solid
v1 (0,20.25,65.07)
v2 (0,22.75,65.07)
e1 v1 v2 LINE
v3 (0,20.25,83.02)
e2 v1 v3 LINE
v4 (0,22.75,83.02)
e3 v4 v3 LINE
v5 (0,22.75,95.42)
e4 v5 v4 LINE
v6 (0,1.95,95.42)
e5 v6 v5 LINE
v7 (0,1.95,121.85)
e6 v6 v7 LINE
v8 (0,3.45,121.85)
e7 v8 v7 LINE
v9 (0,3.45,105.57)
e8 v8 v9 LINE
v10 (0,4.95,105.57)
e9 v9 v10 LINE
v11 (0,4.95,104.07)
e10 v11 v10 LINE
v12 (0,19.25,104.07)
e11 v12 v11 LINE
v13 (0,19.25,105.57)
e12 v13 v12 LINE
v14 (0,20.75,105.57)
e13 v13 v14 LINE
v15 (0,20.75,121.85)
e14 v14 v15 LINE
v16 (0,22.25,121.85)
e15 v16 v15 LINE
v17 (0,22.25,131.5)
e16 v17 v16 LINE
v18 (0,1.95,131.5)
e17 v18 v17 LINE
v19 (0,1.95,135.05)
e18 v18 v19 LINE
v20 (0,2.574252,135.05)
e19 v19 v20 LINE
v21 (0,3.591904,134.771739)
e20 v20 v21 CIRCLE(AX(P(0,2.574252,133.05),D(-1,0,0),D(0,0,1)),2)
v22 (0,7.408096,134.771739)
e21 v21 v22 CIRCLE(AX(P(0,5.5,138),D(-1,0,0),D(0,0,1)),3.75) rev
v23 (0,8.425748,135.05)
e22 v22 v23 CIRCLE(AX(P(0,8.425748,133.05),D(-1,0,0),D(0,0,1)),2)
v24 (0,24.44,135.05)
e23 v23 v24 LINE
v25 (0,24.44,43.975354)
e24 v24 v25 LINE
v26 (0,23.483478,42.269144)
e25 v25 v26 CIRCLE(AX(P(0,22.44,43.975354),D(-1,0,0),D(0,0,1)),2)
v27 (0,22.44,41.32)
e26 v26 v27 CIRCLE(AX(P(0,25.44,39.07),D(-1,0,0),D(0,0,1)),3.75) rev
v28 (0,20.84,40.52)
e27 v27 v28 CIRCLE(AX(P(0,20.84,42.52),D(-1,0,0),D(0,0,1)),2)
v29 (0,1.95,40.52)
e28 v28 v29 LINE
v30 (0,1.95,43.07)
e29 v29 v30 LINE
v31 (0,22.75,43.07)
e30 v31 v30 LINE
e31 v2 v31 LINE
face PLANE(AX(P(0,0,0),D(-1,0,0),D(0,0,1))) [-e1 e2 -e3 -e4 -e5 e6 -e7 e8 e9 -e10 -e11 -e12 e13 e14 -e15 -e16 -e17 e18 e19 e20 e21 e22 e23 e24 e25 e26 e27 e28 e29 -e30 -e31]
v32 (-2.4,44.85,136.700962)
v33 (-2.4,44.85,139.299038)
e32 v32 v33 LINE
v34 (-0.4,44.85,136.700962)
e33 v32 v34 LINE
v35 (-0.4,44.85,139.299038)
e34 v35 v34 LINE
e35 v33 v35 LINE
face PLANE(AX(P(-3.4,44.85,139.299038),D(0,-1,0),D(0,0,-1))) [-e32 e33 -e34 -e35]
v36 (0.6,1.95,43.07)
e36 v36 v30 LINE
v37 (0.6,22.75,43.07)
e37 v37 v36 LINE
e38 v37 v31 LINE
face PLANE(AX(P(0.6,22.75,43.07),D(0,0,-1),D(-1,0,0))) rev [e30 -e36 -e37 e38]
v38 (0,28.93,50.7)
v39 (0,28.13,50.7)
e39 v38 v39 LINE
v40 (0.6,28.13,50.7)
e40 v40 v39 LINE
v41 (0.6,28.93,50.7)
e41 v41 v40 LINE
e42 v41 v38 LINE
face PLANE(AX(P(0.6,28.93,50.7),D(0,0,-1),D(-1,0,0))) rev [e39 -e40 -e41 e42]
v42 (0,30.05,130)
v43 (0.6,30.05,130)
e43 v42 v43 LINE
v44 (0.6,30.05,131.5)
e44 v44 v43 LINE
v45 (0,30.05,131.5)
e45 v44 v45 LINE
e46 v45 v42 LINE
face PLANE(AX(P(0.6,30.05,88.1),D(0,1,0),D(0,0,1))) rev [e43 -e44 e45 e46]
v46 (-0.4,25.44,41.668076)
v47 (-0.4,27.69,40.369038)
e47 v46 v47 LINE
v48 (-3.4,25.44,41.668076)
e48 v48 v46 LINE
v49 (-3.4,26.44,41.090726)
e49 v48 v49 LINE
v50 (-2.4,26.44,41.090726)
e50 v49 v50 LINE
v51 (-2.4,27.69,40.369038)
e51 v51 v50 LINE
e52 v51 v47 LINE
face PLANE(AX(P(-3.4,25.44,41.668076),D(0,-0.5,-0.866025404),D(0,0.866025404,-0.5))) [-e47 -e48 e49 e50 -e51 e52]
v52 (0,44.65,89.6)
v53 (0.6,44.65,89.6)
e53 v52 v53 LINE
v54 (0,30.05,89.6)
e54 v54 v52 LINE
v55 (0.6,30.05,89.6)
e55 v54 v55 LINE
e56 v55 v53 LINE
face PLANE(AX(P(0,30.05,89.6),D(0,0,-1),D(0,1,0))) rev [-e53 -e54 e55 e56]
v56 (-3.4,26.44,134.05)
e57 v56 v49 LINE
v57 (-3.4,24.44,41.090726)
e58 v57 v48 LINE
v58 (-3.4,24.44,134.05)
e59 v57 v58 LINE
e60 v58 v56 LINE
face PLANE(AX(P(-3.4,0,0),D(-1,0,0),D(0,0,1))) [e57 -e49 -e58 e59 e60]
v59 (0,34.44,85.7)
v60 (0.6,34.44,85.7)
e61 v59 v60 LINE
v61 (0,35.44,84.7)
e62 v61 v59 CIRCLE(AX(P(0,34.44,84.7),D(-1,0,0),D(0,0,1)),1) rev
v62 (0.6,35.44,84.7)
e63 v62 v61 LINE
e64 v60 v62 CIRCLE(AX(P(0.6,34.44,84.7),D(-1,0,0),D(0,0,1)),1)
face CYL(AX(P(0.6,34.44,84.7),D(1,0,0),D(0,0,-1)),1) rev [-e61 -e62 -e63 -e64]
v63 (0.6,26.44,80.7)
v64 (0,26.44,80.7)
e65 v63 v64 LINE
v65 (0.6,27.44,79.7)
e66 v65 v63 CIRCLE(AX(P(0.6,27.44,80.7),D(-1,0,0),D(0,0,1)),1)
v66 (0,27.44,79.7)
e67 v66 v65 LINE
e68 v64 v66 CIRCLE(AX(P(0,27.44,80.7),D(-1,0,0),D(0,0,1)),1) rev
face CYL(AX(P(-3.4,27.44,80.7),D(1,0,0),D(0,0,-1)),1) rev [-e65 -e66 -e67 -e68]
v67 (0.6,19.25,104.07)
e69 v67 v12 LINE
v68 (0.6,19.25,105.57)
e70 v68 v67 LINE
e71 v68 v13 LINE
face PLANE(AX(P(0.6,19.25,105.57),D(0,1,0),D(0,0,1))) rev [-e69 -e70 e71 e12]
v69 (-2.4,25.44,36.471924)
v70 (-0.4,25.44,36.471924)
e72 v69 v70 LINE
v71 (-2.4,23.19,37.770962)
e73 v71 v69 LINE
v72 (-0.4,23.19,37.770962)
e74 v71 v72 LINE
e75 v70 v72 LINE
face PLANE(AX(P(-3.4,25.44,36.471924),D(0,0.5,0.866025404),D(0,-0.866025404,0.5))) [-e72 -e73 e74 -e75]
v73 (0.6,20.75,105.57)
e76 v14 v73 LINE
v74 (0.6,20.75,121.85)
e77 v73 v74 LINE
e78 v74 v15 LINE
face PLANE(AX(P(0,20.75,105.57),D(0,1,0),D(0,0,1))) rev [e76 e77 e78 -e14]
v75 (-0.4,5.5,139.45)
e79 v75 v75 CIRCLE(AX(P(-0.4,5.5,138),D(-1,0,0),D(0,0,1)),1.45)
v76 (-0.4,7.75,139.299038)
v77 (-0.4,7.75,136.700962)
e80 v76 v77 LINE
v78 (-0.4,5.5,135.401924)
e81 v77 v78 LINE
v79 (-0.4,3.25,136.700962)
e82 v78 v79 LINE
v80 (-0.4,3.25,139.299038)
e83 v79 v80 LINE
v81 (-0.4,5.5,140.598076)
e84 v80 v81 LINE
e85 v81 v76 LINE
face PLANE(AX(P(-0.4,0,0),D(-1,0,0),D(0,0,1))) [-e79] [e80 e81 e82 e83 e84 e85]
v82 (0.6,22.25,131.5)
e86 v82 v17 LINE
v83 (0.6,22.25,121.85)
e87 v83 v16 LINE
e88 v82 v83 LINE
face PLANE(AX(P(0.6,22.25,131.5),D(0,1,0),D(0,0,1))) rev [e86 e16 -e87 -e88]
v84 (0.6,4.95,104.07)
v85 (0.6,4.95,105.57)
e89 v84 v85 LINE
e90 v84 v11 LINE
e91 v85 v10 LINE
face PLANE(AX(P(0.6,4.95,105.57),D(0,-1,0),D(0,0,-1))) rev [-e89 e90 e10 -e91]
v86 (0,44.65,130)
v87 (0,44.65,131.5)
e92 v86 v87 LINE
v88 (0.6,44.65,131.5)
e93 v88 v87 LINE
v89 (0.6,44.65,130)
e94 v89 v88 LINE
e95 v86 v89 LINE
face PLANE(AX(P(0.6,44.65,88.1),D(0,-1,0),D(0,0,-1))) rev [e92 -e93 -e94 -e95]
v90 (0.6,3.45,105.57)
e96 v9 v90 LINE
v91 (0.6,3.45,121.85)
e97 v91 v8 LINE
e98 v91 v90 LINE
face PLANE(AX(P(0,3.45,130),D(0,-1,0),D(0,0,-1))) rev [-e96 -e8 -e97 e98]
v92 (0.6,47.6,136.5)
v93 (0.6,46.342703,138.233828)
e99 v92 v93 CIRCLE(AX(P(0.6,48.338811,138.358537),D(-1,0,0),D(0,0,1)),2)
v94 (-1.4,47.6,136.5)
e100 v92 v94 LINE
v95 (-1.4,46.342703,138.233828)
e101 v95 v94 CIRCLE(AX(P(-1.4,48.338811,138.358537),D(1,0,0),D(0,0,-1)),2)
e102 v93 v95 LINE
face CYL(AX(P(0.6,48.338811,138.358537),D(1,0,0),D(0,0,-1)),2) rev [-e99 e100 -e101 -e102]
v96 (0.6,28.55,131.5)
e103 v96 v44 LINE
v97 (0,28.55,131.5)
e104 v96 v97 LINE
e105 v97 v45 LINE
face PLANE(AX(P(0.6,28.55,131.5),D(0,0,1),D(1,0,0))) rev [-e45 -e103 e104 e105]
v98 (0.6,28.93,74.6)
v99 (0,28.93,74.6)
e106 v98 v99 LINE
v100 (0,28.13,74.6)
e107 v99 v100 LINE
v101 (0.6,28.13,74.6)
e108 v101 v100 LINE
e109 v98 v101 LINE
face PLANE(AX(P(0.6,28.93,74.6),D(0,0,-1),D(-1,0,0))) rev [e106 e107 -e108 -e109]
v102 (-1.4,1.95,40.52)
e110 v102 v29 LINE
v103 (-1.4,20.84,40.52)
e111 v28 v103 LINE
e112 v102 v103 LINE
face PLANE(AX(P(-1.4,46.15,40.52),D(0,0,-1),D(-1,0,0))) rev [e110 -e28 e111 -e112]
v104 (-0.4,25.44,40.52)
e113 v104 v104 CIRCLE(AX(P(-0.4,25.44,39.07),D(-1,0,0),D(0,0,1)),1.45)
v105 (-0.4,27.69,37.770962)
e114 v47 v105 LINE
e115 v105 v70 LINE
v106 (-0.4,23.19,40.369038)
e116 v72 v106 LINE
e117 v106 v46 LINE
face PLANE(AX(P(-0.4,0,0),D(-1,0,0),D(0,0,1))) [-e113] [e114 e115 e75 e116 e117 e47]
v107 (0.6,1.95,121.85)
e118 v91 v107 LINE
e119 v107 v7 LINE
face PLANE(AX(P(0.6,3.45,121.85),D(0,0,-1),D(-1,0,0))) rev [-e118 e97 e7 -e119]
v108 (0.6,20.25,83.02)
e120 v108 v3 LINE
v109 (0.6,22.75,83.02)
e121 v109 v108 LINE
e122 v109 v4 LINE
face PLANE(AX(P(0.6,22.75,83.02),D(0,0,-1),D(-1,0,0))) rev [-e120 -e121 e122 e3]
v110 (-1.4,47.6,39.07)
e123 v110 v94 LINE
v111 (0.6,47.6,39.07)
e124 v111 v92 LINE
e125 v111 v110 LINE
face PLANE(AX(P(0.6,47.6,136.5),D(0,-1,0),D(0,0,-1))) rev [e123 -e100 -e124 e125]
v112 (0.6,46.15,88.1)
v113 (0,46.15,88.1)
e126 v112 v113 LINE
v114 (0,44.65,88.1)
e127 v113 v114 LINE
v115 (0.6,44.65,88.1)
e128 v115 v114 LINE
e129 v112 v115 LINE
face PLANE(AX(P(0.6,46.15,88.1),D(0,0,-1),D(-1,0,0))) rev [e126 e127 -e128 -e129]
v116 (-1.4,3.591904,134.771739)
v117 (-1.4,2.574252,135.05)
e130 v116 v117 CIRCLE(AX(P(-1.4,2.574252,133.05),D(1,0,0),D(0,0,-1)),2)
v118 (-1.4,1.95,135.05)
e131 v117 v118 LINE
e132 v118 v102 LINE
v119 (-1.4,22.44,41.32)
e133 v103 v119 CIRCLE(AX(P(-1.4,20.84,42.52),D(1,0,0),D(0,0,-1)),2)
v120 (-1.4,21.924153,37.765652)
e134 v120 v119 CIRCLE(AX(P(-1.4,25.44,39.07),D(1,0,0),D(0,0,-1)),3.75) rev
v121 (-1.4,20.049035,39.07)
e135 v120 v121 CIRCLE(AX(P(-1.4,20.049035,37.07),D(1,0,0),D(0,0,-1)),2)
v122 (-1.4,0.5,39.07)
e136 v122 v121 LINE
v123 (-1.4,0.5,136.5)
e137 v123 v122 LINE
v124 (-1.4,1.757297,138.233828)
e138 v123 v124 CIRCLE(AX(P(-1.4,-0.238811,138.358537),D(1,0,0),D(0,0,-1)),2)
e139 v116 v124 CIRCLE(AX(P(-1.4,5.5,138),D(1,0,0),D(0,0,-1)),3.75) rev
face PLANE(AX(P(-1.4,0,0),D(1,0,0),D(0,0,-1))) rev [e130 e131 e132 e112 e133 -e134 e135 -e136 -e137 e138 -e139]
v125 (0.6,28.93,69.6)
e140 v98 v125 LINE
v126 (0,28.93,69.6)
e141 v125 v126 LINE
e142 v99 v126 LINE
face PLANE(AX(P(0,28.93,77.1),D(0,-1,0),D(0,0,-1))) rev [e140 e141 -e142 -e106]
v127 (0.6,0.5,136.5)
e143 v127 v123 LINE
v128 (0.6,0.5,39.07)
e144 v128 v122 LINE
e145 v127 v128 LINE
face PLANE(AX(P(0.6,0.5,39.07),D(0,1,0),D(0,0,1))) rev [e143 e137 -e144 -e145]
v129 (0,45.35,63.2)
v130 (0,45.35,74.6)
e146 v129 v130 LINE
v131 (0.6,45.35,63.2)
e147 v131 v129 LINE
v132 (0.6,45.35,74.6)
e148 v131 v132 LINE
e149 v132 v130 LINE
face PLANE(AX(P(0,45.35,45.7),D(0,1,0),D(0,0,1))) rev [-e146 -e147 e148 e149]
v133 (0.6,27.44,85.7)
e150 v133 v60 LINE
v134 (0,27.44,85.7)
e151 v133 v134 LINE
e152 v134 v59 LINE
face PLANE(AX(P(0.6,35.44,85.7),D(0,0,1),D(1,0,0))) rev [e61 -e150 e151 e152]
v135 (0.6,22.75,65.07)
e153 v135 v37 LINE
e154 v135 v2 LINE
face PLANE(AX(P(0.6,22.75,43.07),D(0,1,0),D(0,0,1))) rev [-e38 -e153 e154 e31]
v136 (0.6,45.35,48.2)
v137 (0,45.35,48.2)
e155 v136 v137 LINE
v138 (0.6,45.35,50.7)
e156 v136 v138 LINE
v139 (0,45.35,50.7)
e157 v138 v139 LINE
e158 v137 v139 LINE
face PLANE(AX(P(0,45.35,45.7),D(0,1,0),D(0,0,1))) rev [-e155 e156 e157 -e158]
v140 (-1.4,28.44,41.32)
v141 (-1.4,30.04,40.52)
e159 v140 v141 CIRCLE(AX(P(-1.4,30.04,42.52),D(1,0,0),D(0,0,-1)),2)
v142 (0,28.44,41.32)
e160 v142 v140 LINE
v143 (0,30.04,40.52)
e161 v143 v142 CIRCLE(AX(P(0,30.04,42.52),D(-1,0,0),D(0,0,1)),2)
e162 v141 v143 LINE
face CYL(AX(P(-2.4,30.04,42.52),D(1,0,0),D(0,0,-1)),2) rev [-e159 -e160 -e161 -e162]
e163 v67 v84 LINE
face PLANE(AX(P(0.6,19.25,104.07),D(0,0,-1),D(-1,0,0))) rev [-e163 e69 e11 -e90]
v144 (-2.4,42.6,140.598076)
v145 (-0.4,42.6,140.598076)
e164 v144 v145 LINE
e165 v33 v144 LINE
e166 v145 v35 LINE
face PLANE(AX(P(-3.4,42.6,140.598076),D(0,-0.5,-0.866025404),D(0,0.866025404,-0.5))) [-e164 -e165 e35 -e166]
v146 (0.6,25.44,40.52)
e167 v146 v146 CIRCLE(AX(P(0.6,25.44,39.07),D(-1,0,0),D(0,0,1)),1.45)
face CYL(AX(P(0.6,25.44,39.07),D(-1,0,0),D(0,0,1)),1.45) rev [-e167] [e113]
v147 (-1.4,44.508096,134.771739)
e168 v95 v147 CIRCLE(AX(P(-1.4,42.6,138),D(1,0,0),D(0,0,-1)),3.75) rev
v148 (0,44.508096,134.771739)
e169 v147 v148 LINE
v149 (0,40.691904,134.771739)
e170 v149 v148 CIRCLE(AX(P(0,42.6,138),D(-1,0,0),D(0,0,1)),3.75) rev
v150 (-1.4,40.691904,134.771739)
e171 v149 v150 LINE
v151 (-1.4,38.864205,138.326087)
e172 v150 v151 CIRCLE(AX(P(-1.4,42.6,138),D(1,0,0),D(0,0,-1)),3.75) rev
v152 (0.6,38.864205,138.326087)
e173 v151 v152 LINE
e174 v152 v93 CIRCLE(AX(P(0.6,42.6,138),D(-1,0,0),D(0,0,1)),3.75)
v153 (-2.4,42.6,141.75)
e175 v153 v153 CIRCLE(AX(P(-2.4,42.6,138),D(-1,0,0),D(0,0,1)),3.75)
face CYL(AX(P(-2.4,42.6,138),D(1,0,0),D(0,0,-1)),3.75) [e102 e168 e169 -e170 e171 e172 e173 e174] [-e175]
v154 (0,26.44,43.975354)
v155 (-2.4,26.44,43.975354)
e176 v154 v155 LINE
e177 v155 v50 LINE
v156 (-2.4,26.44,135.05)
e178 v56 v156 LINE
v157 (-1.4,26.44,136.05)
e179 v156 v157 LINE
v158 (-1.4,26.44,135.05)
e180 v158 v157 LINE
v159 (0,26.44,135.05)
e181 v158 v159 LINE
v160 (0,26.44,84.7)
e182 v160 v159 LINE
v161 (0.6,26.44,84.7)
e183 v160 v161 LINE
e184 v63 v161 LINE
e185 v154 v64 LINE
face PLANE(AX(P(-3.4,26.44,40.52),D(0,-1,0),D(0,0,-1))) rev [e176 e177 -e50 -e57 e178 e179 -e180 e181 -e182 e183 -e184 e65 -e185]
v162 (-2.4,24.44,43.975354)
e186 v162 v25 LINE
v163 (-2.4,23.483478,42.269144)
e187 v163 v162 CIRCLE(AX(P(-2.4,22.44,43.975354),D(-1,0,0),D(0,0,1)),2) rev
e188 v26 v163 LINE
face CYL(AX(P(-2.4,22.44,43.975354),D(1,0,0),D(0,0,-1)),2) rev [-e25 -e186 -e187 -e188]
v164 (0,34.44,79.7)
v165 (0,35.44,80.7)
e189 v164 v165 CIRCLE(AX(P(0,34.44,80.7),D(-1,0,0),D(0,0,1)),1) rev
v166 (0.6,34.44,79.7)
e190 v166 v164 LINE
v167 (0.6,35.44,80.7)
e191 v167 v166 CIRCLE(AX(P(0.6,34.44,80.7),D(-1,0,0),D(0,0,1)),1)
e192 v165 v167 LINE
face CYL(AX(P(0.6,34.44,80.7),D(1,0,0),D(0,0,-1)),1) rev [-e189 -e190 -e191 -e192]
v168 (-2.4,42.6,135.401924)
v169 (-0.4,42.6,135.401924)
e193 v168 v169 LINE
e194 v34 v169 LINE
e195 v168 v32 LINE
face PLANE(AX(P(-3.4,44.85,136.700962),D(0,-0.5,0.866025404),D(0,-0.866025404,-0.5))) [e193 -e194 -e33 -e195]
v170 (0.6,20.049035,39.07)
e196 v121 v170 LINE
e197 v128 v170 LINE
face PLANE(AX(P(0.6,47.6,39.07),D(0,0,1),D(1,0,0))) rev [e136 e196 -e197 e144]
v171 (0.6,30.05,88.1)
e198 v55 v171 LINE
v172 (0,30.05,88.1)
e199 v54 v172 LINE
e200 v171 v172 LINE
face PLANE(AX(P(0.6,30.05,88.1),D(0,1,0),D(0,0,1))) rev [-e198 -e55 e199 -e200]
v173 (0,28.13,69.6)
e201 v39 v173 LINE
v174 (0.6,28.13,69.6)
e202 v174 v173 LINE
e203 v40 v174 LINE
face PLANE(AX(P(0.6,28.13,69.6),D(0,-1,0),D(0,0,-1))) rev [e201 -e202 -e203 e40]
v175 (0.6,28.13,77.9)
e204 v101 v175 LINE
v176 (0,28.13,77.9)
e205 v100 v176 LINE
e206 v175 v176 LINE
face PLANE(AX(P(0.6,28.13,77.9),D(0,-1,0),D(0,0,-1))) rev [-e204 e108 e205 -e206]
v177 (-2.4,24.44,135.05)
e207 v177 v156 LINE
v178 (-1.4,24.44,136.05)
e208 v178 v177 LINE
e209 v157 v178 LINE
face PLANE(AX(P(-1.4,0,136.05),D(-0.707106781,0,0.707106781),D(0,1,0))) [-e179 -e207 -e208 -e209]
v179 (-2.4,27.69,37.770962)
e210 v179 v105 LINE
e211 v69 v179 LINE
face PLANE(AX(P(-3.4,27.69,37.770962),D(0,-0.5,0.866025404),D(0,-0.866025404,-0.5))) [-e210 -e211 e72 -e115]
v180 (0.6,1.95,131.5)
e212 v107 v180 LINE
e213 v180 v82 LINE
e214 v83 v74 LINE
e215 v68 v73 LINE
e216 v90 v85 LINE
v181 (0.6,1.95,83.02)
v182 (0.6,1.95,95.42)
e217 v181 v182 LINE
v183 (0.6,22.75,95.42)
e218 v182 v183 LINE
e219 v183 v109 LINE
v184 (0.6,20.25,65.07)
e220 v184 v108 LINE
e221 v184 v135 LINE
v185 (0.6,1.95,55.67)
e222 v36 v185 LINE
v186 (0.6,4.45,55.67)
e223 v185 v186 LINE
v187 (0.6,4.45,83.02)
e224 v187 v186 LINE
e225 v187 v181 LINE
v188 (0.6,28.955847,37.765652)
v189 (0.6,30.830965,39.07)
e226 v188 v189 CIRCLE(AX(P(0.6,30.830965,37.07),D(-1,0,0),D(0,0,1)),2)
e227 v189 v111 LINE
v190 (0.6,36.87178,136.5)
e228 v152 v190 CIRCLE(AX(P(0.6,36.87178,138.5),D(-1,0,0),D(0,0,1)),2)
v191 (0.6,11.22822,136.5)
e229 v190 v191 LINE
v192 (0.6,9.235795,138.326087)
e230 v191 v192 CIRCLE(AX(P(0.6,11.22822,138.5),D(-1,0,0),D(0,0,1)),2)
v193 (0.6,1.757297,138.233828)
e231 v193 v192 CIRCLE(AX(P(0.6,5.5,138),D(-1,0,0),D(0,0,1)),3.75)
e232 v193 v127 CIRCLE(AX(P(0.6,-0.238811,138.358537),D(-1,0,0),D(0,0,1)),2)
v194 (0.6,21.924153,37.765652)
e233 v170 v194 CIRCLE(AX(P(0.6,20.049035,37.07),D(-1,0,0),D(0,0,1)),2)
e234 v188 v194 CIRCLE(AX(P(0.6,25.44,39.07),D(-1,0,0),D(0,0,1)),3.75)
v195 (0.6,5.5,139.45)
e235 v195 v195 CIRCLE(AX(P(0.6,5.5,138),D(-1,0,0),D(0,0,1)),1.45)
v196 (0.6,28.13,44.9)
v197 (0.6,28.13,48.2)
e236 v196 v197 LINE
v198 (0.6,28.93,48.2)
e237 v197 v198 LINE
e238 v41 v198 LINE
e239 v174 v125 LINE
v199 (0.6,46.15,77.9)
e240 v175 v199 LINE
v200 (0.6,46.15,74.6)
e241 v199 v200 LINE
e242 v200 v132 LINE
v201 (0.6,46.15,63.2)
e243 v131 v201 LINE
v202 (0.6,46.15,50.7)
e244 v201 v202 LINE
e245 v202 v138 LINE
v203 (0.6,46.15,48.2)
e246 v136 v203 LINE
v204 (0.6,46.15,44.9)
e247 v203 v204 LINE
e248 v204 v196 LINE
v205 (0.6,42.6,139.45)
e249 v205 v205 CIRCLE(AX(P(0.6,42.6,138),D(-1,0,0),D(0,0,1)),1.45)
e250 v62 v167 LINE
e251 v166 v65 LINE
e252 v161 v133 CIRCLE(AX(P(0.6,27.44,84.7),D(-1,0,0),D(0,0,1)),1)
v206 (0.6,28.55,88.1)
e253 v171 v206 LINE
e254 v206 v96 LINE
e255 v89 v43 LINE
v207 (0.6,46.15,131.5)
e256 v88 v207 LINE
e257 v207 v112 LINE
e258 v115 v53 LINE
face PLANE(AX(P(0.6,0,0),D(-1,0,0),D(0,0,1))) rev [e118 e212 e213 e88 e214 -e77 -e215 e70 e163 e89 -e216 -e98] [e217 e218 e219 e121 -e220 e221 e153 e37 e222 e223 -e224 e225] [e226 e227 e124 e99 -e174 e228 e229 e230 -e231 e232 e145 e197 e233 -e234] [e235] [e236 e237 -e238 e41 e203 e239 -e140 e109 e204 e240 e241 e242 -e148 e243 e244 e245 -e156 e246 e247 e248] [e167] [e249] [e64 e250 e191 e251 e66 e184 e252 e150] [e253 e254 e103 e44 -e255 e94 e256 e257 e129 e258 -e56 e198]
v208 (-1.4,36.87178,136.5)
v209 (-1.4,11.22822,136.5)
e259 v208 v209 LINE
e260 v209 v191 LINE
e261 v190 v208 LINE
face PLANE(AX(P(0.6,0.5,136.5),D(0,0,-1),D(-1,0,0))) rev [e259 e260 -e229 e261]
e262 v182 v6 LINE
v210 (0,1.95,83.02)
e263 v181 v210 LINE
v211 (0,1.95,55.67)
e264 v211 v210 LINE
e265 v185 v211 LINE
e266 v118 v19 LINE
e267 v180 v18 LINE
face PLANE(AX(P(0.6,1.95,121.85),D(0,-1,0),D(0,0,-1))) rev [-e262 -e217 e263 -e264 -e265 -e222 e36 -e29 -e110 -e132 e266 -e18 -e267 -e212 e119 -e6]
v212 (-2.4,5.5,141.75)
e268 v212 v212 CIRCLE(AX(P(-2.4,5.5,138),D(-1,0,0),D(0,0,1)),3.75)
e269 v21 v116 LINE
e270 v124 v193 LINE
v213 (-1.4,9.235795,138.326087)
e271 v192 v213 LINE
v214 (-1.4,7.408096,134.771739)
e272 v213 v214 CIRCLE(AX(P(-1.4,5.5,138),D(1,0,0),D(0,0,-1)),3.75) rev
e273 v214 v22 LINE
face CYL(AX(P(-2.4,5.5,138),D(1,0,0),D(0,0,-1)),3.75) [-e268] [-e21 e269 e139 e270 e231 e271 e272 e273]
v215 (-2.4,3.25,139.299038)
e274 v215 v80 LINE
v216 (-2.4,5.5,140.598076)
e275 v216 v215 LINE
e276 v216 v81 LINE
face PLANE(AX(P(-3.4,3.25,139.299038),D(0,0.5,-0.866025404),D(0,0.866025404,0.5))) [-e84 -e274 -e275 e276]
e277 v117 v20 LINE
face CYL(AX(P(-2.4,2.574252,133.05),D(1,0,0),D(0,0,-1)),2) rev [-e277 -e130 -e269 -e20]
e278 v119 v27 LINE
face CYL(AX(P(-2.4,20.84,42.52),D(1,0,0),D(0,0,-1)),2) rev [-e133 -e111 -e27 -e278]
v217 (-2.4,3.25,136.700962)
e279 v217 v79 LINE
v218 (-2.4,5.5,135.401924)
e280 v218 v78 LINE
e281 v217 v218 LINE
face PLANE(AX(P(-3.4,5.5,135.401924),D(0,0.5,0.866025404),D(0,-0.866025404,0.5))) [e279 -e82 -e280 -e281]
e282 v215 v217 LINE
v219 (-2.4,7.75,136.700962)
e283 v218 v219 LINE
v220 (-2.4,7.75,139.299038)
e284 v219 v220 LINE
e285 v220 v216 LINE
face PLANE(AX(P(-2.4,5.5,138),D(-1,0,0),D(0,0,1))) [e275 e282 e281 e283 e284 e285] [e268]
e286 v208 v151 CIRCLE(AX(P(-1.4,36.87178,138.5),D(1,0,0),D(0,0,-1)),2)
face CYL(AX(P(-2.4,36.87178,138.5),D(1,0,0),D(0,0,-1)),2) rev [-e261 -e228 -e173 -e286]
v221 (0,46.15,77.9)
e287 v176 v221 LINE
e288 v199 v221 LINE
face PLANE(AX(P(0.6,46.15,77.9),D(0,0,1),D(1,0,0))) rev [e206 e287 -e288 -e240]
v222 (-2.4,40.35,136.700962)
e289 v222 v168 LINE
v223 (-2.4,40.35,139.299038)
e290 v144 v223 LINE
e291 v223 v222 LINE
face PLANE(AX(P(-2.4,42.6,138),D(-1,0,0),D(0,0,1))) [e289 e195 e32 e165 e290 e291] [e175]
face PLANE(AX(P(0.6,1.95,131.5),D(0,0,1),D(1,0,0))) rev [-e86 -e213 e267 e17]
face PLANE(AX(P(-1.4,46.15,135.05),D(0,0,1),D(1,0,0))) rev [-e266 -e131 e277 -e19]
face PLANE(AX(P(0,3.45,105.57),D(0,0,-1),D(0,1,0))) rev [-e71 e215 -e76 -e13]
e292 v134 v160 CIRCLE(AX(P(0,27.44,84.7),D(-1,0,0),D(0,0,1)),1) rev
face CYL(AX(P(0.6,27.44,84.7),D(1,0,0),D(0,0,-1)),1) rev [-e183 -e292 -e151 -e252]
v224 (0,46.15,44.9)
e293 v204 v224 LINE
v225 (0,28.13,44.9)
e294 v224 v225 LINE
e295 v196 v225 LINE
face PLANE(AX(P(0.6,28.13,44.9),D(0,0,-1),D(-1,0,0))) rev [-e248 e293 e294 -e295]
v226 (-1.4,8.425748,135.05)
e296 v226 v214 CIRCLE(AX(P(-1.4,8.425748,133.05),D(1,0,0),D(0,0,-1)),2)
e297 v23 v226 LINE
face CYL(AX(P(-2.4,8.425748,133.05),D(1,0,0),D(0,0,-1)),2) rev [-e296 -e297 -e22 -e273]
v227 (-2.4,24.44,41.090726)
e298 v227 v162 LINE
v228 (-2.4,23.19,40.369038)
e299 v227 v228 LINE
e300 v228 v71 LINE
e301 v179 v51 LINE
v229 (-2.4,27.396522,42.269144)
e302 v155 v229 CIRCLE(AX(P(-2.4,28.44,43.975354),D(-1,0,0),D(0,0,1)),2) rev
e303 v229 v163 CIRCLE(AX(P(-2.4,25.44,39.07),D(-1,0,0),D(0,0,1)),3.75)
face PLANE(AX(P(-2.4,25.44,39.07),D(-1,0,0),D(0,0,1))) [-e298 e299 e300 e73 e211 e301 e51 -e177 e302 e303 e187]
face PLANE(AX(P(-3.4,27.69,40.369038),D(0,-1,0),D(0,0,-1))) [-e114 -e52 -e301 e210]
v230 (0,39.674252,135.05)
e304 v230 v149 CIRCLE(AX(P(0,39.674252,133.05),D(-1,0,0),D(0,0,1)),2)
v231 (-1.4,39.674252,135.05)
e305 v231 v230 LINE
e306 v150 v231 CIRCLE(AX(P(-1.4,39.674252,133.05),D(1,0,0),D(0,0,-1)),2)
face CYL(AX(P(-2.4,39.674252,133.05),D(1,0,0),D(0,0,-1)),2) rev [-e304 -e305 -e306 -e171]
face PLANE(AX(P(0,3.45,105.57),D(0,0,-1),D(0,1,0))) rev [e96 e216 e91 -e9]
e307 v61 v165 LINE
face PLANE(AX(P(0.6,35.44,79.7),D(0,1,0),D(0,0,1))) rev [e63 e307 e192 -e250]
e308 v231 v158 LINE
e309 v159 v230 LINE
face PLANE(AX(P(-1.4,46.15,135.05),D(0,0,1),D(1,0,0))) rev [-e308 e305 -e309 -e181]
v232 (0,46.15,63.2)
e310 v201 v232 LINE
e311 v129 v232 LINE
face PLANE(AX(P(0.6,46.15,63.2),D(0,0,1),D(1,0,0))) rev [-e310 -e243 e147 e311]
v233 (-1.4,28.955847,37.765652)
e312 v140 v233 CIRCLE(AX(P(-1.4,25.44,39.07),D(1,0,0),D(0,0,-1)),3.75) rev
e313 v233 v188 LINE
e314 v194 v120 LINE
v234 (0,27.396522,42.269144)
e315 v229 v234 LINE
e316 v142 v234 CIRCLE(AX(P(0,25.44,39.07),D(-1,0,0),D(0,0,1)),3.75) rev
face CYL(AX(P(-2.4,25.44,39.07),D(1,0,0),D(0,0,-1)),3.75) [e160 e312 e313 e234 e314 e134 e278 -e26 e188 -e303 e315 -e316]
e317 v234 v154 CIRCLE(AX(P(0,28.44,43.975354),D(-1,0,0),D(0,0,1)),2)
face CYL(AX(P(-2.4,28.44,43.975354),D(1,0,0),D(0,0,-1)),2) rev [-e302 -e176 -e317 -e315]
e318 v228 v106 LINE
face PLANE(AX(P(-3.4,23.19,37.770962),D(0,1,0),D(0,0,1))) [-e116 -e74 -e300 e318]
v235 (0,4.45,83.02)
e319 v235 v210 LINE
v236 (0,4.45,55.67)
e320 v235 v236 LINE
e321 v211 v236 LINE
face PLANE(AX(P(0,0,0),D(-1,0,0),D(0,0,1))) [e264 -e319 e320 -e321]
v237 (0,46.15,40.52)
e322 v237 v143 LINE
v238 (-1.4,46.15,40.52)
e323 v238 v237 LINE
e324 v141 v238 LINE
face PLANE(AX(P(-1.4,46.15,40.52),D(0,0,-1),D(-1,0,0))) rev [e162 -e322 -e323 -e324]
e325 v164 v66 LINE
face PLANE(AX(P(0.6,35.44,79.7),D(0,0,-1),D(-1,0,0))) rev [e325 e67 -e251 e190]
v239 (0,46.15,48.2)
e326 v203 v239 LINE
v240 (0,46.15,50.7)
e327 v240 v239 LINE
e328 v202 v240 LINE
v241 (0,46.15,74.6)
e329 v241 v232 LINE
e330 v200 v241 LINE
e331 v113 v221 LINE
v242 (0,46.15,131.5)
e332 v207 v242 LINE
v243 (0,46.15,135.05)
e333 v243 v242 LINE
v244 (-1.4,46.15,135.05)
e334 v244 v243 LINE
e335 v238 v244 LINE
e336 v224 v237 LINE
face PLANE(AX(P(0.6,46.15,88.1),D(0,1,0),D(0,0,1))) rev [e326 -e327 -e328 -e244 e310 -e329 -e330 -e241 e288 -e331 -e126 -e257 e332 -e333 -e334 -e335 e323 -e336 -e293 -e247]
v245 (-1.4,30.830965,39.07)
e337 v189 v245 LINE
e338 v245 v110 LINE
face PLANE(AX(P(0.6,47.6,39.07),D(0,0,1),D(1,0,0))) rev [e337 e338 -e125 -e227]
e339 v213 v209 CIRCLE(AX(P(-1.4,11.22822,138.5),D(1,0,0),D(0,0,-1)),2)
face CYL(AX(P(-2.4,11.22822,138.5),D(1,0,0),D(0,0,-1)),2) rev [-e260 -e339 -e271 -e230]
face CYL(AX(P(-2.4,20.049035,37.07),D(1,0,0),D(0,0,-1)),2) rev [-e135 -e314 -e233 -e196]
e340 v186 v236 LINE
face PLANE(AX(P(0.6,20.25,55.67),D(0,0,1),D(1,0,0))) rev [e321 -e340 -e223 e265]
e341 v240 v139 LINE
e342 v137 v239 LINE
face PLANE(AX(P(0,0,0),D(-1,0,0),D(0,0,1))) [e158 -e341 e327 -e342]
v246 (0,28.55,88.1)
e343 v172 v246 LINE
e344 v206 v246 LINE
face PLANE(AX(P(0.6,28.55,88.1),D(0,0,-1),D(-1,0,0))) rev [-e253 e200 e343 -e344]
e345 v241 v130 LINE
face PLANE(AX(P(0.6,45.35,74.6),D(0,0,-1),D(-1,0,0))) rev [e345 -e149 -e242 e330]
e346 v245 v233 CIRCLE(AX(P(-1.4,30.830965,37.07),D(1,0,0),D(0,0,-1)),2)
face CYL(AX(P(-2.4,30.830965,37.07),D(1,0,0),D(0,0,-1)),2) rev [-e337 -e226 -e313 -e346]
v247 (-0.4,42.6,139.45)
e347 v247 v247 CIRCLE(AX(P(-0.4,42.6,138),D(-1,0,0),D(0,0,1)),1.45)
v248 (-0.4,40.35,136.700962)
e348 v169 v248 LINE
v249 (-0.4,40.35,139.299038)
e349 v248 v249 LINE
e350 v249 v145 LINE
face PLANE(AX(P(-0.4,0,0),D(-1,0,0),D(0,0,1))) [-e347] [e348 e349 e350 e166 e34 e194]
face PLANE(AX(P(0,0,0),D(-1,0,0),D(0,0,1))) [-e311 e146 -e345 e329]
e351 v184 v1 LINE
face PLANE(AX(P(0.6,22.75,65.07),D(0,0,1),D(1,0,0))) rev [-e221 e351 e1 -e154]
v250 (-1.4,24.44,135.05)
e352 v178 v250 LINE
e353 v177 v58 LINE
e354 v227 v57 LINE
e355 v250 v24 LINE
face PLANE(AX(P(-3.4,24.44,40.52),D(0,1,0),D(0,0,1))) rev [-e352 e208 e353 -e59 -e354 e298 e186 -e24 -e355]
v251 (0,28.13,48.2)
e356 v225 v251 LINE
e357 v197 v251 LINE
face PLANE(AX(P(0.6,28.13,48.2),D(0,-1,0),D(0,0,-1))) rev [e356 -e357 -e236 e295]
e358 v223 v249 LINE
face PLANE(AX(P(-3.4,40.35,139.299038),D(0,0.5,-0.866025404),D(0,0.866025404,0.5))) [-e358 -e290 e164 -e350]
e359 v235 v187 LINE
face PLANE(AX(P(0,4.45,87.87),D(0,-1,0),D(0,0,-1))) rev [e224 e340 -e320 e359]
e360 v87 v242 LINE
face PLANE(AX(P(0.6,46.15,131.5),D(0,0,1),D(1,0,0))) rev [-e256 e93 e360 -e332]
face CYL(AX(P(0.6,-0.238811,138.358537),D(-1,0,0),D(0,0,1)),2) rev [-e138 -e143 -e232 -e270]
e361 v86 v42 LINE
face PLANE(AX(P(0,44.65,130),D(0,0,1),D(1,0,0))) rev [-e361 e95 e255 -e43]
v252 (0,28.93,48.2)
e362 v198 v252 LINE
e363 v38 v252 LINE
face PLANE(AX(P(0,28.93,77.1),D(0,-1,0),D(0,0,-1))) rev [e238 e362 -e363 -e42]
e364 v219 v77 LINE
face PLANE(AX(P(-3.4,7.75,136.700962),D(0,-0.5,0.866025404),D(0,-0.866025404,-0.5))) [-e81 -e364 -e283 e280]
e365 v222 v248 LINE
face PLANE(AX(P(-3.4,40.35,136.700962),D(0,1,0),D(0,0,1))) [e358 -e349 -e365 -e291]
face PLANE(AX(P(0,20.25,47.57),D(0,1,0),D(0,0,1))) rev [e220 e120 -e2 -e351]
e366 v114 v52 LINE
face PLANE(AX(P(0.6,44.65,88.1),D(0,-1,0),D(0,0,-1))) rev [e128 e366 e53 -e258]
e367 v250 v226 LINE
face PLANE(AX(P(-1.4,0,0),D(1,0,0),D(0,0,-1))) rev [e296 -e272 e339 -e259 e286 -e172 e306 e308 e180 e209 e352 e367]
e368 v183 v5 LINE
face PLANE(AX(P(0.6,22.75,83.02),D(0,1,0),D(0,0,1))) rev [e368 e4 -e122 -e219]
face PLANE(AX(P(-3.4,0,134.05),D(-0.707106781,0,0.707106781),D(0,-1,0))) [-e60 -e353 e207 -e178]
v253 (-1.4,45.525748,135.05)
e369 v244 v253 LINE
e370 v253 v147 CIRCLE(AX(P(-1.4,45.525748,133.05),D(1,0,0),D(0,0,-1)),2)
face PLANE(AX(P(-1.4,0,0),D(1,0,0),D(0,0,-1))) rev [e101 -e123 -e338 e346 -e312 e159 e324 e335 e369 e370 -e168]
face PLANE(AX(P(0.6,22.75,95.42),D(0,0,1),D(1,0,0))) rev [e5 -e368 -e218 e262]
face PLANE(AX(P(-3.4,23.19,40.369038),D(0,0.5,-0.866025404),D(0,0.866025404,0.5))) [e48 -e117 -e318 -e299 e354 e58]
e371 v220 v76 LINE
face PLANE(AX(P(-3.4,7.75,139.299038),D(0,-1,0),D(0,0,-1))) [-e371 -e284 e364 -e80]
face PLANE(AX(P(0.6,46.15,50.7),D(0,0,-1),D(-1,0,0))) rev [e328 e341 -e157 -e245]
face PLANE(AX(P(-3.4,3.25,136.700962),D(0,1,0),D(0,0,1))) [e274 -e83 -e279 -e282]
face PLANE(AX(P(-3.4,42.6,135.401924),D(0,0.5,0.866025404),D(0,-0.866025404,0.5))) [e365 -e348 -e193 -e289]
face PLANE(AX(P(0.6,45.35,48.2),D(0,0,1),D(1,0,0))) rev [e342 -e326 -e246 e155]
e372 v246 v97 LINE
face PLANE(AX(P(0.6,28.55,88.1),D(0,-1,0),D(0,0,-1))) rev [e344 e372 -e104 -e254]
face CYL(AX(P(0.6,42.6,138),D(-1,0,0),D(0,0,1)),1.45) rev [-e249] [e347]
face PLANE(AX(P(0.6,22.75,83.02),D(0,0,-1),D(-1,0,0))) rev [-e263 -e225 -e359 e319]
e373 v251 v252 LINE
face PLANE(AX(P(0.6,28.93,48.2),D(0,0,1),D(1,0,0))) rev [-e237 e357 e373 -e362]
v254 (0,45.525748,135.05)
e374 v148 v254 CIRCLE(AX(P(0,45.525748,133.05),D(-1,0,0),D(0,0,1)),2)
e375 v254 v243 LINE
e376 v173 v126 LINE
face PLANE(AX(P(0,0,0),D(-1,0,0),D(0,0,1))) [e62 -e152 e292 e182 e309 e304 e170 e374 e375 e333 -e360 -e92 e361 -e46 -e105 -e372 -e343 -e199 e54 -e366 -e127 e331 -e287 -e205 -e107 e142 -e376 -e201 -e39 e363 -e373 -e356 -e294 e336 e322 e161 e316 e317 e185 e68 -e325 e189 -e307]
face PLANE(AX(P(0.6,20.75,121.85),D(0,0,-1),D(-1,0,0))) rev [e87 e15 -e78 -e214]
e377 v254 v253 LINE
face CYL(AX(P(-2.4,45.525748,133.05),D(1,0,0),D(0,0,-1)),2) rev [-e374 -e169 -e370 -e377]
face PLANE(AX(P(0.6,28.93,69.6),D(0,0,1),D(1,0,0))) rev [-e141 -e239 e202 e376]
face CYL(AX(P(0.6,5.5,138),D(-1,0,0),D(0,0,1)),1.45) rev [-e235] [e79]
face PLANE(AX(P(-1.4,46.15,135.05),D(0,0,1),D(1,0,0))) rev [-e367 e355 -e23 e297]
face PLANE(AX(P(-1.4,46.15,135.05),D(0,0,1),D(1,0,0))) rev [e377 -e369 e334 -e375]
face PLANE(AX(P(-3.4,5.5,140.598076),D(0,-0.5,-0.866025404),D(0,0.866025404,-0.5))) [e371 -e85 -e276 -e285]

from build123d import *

# Parameters (mm, degrees)
BOSS_EXTRUDE1_DEPTH             = 0.6
SKETCH3_W                       = 40.4
SKETCH3_H                       = 14.6
SKETCH3_W_2                     = 31.4
SKETCH3_H_2                     = 16.42
SKETCH3_W_3                     = 40.3
SKETCH3_H_3                     = 15.8
SKETCH3_W_4                     = 24.43
SKETCH3_H_4                     = 17.3
CUT_EXTRUDE1_DEPTH              = 145.562685365
SKETCH4_W                       = 12.4
SKETCH4_H                       = 20.8
SKETCH4_W_2                     = 12.5
SKETCH4_H_2                     = 0.8
SKETCH4_W_3                     = 18.9
SKETCH4_W_4                     = 43.4
SKETCH4_H_3                     = 1.5
SKETCH4_W_5                     = 1.5
SKETCH4_H_4                     = 14.3
CUT_EXTRUDE2_DEPTH              = 145.562685365
SKETCH5_W                       = 97.43
SKETCH5_H                       = 47.1
SKETCH5_W_2                     = 94.53
SKETCH5_H_2                     = 44.2
BOSS_EXTRUDE2_DEPTH             = 2
BOSS_EXTRUDE3_REACH             = 146.575
SKETCH6_W                       = 94.53
SKETCH6_H                       = 2
BOSS_EXTRUDE3_DIRECTION_2_DEPTH = 2
SKETCH7_R                       = 3.75
BOSS_EXTRUDE4_DEPTH             = 3
CUT_EXTRUDE3_DEPTH              = 150.558759356
CUT_EXTRUDE3_DEPTH_BACK         = 2
SKETCH9_R                       = 1.45
CUT_EXTRUDE4_DEPTH              = 150.558759356
CHAMFER1_SIZE                   = 1
FILLET1_R                       = 2
CUT_EXTRUDE5_DEPTH              = 150.542042583
CUT_EXTRUDE5_DEPTH_BACK         = 150.542042583
SKETCH10_W                      = 6
SKETCH10_H                      = 9
FILLET2_R                       = 1


# Some blends are built 0.0001 mm under size
with BuildPart() as part:
    # Sketch1 → Boss-Extrude1 (new body)
    with BuildSketch(Plane(origin=(0, 0, 0), x_dir=(0, 0, -1), z_dir=(1, 0, 0))):
        Polygon((-39.07, 0.5), (-136.5, 0.5), (-136.5, 47.6), (-39.07, 47.6), (-39.07, 28.13), align=None)
    extrude(amount=BOSS_EXTRUDE1_DEPTH)

    # Sketch3 → Cut-Extrude1 (cut, through all)
    with BuildSketch(Plane(origin=(0.6, 0, 0), x_dir=(0, 0, -1), z_dir=(1, 0, 0))):
        with Locations((-109.8, 37.35)):
            Rectangle(SKETCH3_W, SKETCH3_H)
        with Locations((-61.4, 37.14)):
            Rectangle(SKETCH3_W_2, SKETCH3_H_2)
        with Locations((-67.72, 12.35)):
            Rectangle(SKETCH3_W_3, SKETCH3_H_3)
        with Locations((-117.785, 12.1)):
            Rectangle(SKETCH3_W_4, SKETCH3_H_4)
    extrude(amount=-CUT_EXTRUDE1_DEPTH, mode=Mode.SUBTRACT)

    # Sketch4 → Cut-Extrude2 (cut, through all)
    with BuildSketch(Plane.ZY):
        with Locations((89.22, 12.35)):
            Rectangle(SKETCH4_W, SKETCH4_H)
        Polygon((65.07, 22.75), (65.07, 20.25), (55.67, 20.25), (55.67, 1.95), (43.07, 1.95), (43.07, 22.75), align=None)
        Polygon((44.9, 28.13), (44.9, 46.15), (48.2, 46.15), (48.2, 45.35), (45.7, 45.35), (45.7, 28.93), (48.2, 28.93), (48.2, 28.13), align=None)
        Polygon((77.9, 28.13), (74.6, 28.13), (74.6, 28.93), (77.1, 28.93), (77.1, 45.35), (74.6, 45.35), (74.6, 46.15), (77.9, 46.15), align=None)
        with Locations((56.95, 45.75)):
            Rectangle(SKETCH4_W_2, SKETCH4_H_2)
        with Locations((60.15, 28.53)):
            Rectangle(SKETCH4_W_3, SKETCH4_H_2)
        with Locations((109.8, 45.4)):
            Rectangle(SKETCH4_W_4, SKETCH4_H_3)
        with Locations((109.8, 29.3)):
            Rectangle(SKETCH4_W_4, SKETCH4_H_3)
        Polygon((131.5, 1.95), (131.5, 22.25), (121.85, 22.25), (121.85, 20.75), (130, 20.75), (130, 3.45), (121.85, 3.45), (121.85, 1.95), align=None)
        with Locations((104.82, 12.1)):
            Rectangle(SKETCH4_W_5, SKETCH4_H_4)
    extrude(amount=-CUT_EXTRUDE2_DEPTH, mode=Mode.SUBTRACT)

    # Sketch5 → Boss-Extrude2 (add)
    with BuildSketch(Plane(origin=(0.6, 0, 0), x_dir=(0, 0, -1), z_dir=(1, 0, 0))):
        with Locations((-87.785, 24.05)):
            Rectangle(SKETCH5_W, SKETCH5_H)
        with Locations((-87.785, 24.05)):
            Rectangle(SKETCH5_W_2, SKETCH5_H_2, mode=Mode.SUBTRACT)
    extrude(amount=-BOSS_EXTRUDE2_DEPTH)

    # Sketch6 → Boss-Extrude3 (add, up to next)
    with BuildSketch(Plane.ZY.offset(1.4), mode=Mode.PRIVATE) as boss_extrude3_sk1:
        with Locations((87.785, 25.44)):
            Rectangle(SKETCH6_W, SKETCH6_H)
    boss_extrude3_tool1 = extrude(boss_extrude3_sk1.sketch, amount=-BOSS_EXTRUDE3_REACH, mode=Mode.PRIVATE) - part.part
    add(boss_extrude3_tool1.solids().sort_by_distance((-1.4, 25.44, 87.785))[0])

    # Sketch6 → Boss-Extrude3 direction 2 (add)
    with BuildSketch(Plane.ZY.offset(1.4)):
        with Locations((87.785, 25.44)):
            Rectangle(SKETCH6_W, SKETCH6_H)
    extrude(amount=BOSS_EXTRUDE3_DIRECTION_2_DEPTH)

    # Sketch7 → Boss-Extrude4 (add)
    with BuildSketch(Plane.ZY.offset(-0.6)):
        with Locations((39.07, 25.44)):
            Circle(SKETCH7_R)
        with Locations(Location((138, 42.6, 0), (0, 0, 141.875088378))):
            Circle(SKETCH7_R)
        with Locations(Location((138, 5.5, 0), (0, 0, 141.875088378))):
            Circle(SKETCH7_R)
    extrude(amount=BOSS_EXTRUDE4_DEPTH)

    # Sketch8 → Cut-Extrude3 (cut, two sides: drawn at the far end of the back side and taken through both)
    with BuildSketch(Plane.ZY.offset(2.4).offset(-CUT_EXTRUDE3_DEPTH_BACK)):
        Polygon((36.471923789, 25.44), (37.770961894, 23.19), (40.369038106, 23.19), (41.668076211, 25.44), (40.369038106, 27.69), (37.770961894, 27.69), align=None)
        Polygon((139.299038106, 44.85), (136.700961894, 44.85), (135.401923789, 42.6), (136.700961894, 40.35), (139.299038106, 40.35), (140.598076211, 42.6), align=None)
        Polygon((139.299038106, 7.75), (136.700961894, 7.75), (135.401923789, 5.5), (136.700961894, 3.25), (139.299038106, 3.25), (140.598076211, 5.5), align=None)
    extrude(amount=CUT_EXTRUDE3_DEPTH + CUT_EXTRUDE3_DEPTH_BACK, mode=Mode.SUBTRACT)

    # Sketch9 → Cut-Extrude4 (cut, through all)
    with BuildSketch(Plane.ZY.offset(0.4)):
        with Locations((138, 5.5)):
            Circle(SKETCH9_R)
        with Locations((138, 42.6)):
            Circle(SKETCH9_R)
        with Locations((39.07, 25.44)):
            Circle(SKETCH9_R)
    extrude(amount=-CUT_EXTRUDE4_DEPTH, mode=Mode.SUBTRACT)

    # Chamfer1
    chamfer1_edges = [part.edges().sort_by_distance(p)[0] for p in [
        (-1.4, 25.44, 135.05),
    ]]
    chamfer(chamfer1_edges, length=CHAMFER1_SIZE)
    chamfer1_2_edges = [part.edges().sort_by_distance(p)[0] for p in [
        (-2.9, 24.44, 135.05),
        (-2.9, 26.44, 135.05),
        (-3.4, 25.44, 135.05),
    ]]
    chamfer(chamfer1_2_edges, length=CHAMFER1_SIZE - 0.0001)  # a hair under: the kernel refuses the full size

    # Fillet1
    # the kernel refuses this fillet: 2 mm, written as the material it adds along each edge
    with BuildSketch(Plane(origin=(-2.4, 26.44, 42.684208074), x_dir=(0, 0, 1), z_dir=(1, 0, 0))) as fillet1_piece_1:
        with BuildLine():
            CenterArc((1.291146144, -2), FILLET1_R, 90, 58.551018611)
            Line((-0.415064019, -0.956521739), (-0.449188222, -0.935652174))
            ThreePointArc((-0.449188222, -0.935652174), (-0.210818686, -0.47683468), (-0.038551553, 0.010666667))
            Line((-0.038551553, 0.010666667), (0, 0.04))
            Line((0, 0.04), (1.291146144, 0.04))
            Line((1.291146144, 0.04), (1.291146144, 0))
        make_face()
    extrude(amount=2.4)
    with BuildSketch(Plane(origin=(-1.4, 21.69, 39.07), x_dir=(0, -1, 0), z_dir=(1, 0, 0))) as fillet1_piece_2:
        with BuildLine():
            CenterArc((1.640964663, 2), FILLET1_R, 200.354406398, 69.645593602)
            Line((-0.234153481, 1.304347826), (-0.271655843, 1.290434783))
            ThreePointArc((-0.271655843, 1.290434783), (-0.098373183, 0.655531532), (-0.04, 0))
            Line((-0.04, 0), (0, -0.04))
            Line((0, -0.04), (1.640964663, -0.04))
            Line((1.640964663, -0.04), (1.640964663, 0))
        make_face()
    extrude(amount=2)
    with BuildSketch(Plane(origin=(-1.4, 21.981676707, 40.52), x_dir=(0, -1, 0), z_dir=(1, 0, 0))) as fillet1_piece_3:
        with BuildLine():
            CenterArc((1.141676707, -2), FILLET1_R, 90, 53.130102354)
            Line((-0.458323293, -0.8), (-0.490323293, -0.776))
            ThreePointArc((-0.490323293, -0.776), (-0.23918937, -0.394255076), (-0.036888782, 0.015466667))
            Line((-0.036888782, 0.015466667), (0, 0.04))
            Line((0, 0.04), (1.141676707, 0.04))
            Line((1.141676707, 0.04), (1.141676707, 0))
        make_face()
    extrude(amount=1.4)
    with BuildSketch(Plane(origin=(-2.4, 24.44, 42.684208074), x_dir=(0, 0, 1), z_dir=(1, 0, 0))) as fillet1_piece_4:
        with BuildLine():
            CenterArc((1.291146144, 2), FILLET1_R, 211.448981389, 58.551018611)
            Line((-0.415064019, 0.956521739), (-0.449188222, 0.935652174))
            ThreePointArc((-0.449188222, 0.935652174), (-0.210818686, 0.47683468), (-0.038551553, -0.010666667))
            Line((-0.038551553, -0.010666667), (0, -0.04))
            Line((0, -0.04), (1.291146144, -0.04))
            Line((1.291146144, -0.04), (1.291146144, 0))
        make_face()
    extrude(amount=2.4)
    with BuildSketch(Plane(origin=(-1.4, 28.898323293, 40.52), x_dir=(0, 1, 0), z_dir=(1, 0, 0))) as fillet1_piece_5:
        with BuildLine():
            CenterArc((1.141676707, 2), FILLET1_R, 216.869897646, 53.130102354)
            Line((-0.458323293, 0.8), (-0.490323293, 0.776))
            ThreePointArc((-0.490323293, 0.776), (-0.23918937, 0.394255076), (-0.036888782, -0.015466667))
            Line((-0.036888782, -0.015466667), (0, -0.04))
            Line((0, -0.04), (1.141676707, -0.04))
            Line((1.141676707, -0.04), (1.141676707, 0))
        make_face()
    extrude(amount=1.4)
    with BuildSketch(Plane(origin=(-1.4, 29.19, 39.07), x_dir=(0, 1, 0), z_dir=(1, 0, 0))) as fillet1_piece_6:
        with BuildLine():
            CenterArc((1.640964663, -2), FILLET1_R, 90, 69.645593602)
            Line((-0.234153481, -1.304347826), (-0.271655843, -1.290434783))
            ThreePointArc((-0.271655843, -1.290434783), (-0.098373183, -0.655531532), (-0.04, 0))
            Line((-0.04, 0), (0, 0.04))
            Line((0, 0.04), (1.640964663, 0.04))
            Line((1.640964663, 0.04), (1.640964663, 0))
        make_face()
    extrude(amount=2)
    with BuildSketch(Plane(origin=(-1.4, 39.163068229, 136.5), x_dir=(0, -0.1615145706174524, 0.9868703275903374), z_dir=(1, 0, 0))) as fillet1_piece_7:
        with BuildLine():
            CenterArc((2.343817028, 1.938174847), FILLET1_R, 170.705181749, 85.011458024)
            Line((0.370076373, 2.261203989), (0.33060156, 2.267664571))
            Line((0.33060156, 2.267664571), (-0.039474813, 0.006460583))
            Line((-0.039474813, 0.006460583), (0.009868703, -0.038763497))
            ThreePointArc((0.009868703, -0.038763497), (0.925190932, 0.075922161), (1.840513161, -0.038763497))
            Line((1.840513161, -0.038763497), (1.850381864, 0))
        make_face()
    extrude(amount=2)
    with BuildSketch(Plane(origin=(-1.4, 46.036931771, 136.5), x_dir=(0, 0.1736759126148829, 0.9848028621898839), z_dir=(1, 0, 0))) as fillet1_piece_8:
        with BuildLine():
            CenterArc((2.230073146, -1.944114194), FILLET1_R, 103.576564864, 64.746091666)
            Line((0.271467301, -1.539314066), (0.232295184, -1.531218063))
            ThreePointArc((0.232295184, -1.531218063), (0.096341536, -0.776604069), (-0.039392114, -0.006947037))
            Line((-0.039392114, -0.006947037), (0.009389782, 0.038882284))
            ThreePointArc((0.009389782, 0.038882284), (0.880292031, -0.064785886), (1.751194281, 0.038882284))
            Line((1.751194281, 0.038882284), (1.760584063, 0))
        make_face()
    extrude(amount=2)
    with BuildSketch(Plane(origin=(0, 44.915167381, 135.05), x_dir=(0, -0.8255542427014289, -0.5643227732049012), z_dir=(-1, 0, 0)), Plane(origin=(-1.4, 40.284832619, 135.05), x_dir=(0, 0.8255542427012595, -0.5643227732051488), z_dir=(1, 0, 0)), Plane(origin=(0, 7.815167381, 135.05), x_dir=(0, -0.825554242701426, -0.5643227732049054), z_dir=(-1, 0, 0))) as fillet1_piece_9:
        with BuildLine():
            CenterArc((0.624578317, -1.995672903), FILLET1_R, 93.769634942, 30.585641738)
            Line((-0.504067229, -0.344564417), (-0.52664014, -0.311542248))
            Line((-0.52664014, -0.311542248), (-0.022572911, 0.03302217))
            Line((-0.022572911, 0.03302217), (0.002629803, 0.039913458))
            ThreePointArc((0.002629803, 0.039913458), (0.246544073, 0.031886693), (0.490458342, 0.039913458))
            Line((0.490458342, 0.039913458), (0.493088145, 0))
        make_face()
    extrude(amount=1.4)
    with BuildSketch(Plane(origin=(-1.4, 2.063068229, 136.5), x_dir=(0, -0.17367591261488685, 0.9848028621898832), z_dir=(1, 0, 0))) as fillet1_piece_10:
        with BuildLine():
            CenterArc((2.230073146, 1.944114194), FILLET1_R, 191.67734347, 64.746091666)
            Line((0.271467301, 1.539314066), (0.232295184, 1.531218063))
            ThreePointArc((0.232295184, 1.531218063), (0.096341536, 0.776604069), (-0.039392114, 0.006947037))
            Line((-0.039392114, 0.006947037), (0.009389782, -0.038882284))
            ThreePointArc((0.009389782, -0.038882284), (0.880292031, 0.064785886), (1.751194281, -0.038882284))
            Line((1.751194281, -0.038882284), (1.760584063, 0))
        make_face()
    extrude(amount=2)
    with BuildSketch(Plane(origin=(-1.4, 8.936931771, 136.5), x_dir=(0, 0.16151457061745614, 0.9868703275903369), z_dir=(1, 0, 0))) as fillet1_piece_11:
        with BuildLine():
            CenterArc((2.343817028, -1.938174847), FILLET1_R, 104.283360227, 85.011458024)
            Line((0.370076373, -2.261203989), (0.33060156, -2.267664571))
            Line((0.33060156, -2.267664571), (-0.039474813, -0.006460583))
            Line((-0.039474813, -0.006460583), (0.009868703, 0.038763497))
            ThreePointArc((0.009868703, 0.038763497), (0.925190932, -0.075922161), (1.840513161, 0.038763497))
            Line((1.840513161, 0.038763497), (1.850381864, 0))
        make_face()
    extrude(amount=2)
    with BuildSketch(Plane(origin=(-1.4, 3.184832619, 135.05), x_dir=(0, -1, 0), z_dir=(1, 0, 0))) as fillet1_piece_12:
        with BuildLine():
            CenterArc((0.610580387, 2), FILLET1_R, 239.414358262, 30.585641738)
            Line((-0.40707101, 0.27826087), (-0.427424038, 0.243826087))
            ThreePointArc((-0.427424038, 0.243826087), (-0.221529892, 0.11280624), (-0.024695119, -0.031466667))
            Line((-0.024695119, -0.031466667), (0, -0.04))
            Line((0, -0.04), (0.610580387, -0.04))
            Line((0.610580387, -0.04), (0.610580387, 0))
        make_face()
    extrude(amount=1.4)

    # Sketch10 → Cut-Extrude5 (cut, two sides: drawn at the far end of the back side and taken through both)
    with BuildSketch(Plane.ZY.offset(1.4).offset(-CUT_EXTRUDE5_DEPTH_BACK)):
        with Locations((82.7, 30.94)):
            Rectangle(SKETCH10_W, SKETCH10_H)
    extrude(amount=CUT_EXTRUDE5_DEPTH + CUT_EXTRUDE5_DEPTH_BACK, mode=Mode.SUBTRACT)

    # Fillet2
    fillet2_edges = [part.edges().sort_by_distance(p)[0] for p in [
        (0.3, 26.44, 79.7),
        (0.3, 35.44, 79.7),
        (0.3, 35.44, 85.7),
        (0.3, 26.44, 85.7),
    ]]
    fillet(fillet2_edges, radius=FILLET2_R)


solid = part.part
